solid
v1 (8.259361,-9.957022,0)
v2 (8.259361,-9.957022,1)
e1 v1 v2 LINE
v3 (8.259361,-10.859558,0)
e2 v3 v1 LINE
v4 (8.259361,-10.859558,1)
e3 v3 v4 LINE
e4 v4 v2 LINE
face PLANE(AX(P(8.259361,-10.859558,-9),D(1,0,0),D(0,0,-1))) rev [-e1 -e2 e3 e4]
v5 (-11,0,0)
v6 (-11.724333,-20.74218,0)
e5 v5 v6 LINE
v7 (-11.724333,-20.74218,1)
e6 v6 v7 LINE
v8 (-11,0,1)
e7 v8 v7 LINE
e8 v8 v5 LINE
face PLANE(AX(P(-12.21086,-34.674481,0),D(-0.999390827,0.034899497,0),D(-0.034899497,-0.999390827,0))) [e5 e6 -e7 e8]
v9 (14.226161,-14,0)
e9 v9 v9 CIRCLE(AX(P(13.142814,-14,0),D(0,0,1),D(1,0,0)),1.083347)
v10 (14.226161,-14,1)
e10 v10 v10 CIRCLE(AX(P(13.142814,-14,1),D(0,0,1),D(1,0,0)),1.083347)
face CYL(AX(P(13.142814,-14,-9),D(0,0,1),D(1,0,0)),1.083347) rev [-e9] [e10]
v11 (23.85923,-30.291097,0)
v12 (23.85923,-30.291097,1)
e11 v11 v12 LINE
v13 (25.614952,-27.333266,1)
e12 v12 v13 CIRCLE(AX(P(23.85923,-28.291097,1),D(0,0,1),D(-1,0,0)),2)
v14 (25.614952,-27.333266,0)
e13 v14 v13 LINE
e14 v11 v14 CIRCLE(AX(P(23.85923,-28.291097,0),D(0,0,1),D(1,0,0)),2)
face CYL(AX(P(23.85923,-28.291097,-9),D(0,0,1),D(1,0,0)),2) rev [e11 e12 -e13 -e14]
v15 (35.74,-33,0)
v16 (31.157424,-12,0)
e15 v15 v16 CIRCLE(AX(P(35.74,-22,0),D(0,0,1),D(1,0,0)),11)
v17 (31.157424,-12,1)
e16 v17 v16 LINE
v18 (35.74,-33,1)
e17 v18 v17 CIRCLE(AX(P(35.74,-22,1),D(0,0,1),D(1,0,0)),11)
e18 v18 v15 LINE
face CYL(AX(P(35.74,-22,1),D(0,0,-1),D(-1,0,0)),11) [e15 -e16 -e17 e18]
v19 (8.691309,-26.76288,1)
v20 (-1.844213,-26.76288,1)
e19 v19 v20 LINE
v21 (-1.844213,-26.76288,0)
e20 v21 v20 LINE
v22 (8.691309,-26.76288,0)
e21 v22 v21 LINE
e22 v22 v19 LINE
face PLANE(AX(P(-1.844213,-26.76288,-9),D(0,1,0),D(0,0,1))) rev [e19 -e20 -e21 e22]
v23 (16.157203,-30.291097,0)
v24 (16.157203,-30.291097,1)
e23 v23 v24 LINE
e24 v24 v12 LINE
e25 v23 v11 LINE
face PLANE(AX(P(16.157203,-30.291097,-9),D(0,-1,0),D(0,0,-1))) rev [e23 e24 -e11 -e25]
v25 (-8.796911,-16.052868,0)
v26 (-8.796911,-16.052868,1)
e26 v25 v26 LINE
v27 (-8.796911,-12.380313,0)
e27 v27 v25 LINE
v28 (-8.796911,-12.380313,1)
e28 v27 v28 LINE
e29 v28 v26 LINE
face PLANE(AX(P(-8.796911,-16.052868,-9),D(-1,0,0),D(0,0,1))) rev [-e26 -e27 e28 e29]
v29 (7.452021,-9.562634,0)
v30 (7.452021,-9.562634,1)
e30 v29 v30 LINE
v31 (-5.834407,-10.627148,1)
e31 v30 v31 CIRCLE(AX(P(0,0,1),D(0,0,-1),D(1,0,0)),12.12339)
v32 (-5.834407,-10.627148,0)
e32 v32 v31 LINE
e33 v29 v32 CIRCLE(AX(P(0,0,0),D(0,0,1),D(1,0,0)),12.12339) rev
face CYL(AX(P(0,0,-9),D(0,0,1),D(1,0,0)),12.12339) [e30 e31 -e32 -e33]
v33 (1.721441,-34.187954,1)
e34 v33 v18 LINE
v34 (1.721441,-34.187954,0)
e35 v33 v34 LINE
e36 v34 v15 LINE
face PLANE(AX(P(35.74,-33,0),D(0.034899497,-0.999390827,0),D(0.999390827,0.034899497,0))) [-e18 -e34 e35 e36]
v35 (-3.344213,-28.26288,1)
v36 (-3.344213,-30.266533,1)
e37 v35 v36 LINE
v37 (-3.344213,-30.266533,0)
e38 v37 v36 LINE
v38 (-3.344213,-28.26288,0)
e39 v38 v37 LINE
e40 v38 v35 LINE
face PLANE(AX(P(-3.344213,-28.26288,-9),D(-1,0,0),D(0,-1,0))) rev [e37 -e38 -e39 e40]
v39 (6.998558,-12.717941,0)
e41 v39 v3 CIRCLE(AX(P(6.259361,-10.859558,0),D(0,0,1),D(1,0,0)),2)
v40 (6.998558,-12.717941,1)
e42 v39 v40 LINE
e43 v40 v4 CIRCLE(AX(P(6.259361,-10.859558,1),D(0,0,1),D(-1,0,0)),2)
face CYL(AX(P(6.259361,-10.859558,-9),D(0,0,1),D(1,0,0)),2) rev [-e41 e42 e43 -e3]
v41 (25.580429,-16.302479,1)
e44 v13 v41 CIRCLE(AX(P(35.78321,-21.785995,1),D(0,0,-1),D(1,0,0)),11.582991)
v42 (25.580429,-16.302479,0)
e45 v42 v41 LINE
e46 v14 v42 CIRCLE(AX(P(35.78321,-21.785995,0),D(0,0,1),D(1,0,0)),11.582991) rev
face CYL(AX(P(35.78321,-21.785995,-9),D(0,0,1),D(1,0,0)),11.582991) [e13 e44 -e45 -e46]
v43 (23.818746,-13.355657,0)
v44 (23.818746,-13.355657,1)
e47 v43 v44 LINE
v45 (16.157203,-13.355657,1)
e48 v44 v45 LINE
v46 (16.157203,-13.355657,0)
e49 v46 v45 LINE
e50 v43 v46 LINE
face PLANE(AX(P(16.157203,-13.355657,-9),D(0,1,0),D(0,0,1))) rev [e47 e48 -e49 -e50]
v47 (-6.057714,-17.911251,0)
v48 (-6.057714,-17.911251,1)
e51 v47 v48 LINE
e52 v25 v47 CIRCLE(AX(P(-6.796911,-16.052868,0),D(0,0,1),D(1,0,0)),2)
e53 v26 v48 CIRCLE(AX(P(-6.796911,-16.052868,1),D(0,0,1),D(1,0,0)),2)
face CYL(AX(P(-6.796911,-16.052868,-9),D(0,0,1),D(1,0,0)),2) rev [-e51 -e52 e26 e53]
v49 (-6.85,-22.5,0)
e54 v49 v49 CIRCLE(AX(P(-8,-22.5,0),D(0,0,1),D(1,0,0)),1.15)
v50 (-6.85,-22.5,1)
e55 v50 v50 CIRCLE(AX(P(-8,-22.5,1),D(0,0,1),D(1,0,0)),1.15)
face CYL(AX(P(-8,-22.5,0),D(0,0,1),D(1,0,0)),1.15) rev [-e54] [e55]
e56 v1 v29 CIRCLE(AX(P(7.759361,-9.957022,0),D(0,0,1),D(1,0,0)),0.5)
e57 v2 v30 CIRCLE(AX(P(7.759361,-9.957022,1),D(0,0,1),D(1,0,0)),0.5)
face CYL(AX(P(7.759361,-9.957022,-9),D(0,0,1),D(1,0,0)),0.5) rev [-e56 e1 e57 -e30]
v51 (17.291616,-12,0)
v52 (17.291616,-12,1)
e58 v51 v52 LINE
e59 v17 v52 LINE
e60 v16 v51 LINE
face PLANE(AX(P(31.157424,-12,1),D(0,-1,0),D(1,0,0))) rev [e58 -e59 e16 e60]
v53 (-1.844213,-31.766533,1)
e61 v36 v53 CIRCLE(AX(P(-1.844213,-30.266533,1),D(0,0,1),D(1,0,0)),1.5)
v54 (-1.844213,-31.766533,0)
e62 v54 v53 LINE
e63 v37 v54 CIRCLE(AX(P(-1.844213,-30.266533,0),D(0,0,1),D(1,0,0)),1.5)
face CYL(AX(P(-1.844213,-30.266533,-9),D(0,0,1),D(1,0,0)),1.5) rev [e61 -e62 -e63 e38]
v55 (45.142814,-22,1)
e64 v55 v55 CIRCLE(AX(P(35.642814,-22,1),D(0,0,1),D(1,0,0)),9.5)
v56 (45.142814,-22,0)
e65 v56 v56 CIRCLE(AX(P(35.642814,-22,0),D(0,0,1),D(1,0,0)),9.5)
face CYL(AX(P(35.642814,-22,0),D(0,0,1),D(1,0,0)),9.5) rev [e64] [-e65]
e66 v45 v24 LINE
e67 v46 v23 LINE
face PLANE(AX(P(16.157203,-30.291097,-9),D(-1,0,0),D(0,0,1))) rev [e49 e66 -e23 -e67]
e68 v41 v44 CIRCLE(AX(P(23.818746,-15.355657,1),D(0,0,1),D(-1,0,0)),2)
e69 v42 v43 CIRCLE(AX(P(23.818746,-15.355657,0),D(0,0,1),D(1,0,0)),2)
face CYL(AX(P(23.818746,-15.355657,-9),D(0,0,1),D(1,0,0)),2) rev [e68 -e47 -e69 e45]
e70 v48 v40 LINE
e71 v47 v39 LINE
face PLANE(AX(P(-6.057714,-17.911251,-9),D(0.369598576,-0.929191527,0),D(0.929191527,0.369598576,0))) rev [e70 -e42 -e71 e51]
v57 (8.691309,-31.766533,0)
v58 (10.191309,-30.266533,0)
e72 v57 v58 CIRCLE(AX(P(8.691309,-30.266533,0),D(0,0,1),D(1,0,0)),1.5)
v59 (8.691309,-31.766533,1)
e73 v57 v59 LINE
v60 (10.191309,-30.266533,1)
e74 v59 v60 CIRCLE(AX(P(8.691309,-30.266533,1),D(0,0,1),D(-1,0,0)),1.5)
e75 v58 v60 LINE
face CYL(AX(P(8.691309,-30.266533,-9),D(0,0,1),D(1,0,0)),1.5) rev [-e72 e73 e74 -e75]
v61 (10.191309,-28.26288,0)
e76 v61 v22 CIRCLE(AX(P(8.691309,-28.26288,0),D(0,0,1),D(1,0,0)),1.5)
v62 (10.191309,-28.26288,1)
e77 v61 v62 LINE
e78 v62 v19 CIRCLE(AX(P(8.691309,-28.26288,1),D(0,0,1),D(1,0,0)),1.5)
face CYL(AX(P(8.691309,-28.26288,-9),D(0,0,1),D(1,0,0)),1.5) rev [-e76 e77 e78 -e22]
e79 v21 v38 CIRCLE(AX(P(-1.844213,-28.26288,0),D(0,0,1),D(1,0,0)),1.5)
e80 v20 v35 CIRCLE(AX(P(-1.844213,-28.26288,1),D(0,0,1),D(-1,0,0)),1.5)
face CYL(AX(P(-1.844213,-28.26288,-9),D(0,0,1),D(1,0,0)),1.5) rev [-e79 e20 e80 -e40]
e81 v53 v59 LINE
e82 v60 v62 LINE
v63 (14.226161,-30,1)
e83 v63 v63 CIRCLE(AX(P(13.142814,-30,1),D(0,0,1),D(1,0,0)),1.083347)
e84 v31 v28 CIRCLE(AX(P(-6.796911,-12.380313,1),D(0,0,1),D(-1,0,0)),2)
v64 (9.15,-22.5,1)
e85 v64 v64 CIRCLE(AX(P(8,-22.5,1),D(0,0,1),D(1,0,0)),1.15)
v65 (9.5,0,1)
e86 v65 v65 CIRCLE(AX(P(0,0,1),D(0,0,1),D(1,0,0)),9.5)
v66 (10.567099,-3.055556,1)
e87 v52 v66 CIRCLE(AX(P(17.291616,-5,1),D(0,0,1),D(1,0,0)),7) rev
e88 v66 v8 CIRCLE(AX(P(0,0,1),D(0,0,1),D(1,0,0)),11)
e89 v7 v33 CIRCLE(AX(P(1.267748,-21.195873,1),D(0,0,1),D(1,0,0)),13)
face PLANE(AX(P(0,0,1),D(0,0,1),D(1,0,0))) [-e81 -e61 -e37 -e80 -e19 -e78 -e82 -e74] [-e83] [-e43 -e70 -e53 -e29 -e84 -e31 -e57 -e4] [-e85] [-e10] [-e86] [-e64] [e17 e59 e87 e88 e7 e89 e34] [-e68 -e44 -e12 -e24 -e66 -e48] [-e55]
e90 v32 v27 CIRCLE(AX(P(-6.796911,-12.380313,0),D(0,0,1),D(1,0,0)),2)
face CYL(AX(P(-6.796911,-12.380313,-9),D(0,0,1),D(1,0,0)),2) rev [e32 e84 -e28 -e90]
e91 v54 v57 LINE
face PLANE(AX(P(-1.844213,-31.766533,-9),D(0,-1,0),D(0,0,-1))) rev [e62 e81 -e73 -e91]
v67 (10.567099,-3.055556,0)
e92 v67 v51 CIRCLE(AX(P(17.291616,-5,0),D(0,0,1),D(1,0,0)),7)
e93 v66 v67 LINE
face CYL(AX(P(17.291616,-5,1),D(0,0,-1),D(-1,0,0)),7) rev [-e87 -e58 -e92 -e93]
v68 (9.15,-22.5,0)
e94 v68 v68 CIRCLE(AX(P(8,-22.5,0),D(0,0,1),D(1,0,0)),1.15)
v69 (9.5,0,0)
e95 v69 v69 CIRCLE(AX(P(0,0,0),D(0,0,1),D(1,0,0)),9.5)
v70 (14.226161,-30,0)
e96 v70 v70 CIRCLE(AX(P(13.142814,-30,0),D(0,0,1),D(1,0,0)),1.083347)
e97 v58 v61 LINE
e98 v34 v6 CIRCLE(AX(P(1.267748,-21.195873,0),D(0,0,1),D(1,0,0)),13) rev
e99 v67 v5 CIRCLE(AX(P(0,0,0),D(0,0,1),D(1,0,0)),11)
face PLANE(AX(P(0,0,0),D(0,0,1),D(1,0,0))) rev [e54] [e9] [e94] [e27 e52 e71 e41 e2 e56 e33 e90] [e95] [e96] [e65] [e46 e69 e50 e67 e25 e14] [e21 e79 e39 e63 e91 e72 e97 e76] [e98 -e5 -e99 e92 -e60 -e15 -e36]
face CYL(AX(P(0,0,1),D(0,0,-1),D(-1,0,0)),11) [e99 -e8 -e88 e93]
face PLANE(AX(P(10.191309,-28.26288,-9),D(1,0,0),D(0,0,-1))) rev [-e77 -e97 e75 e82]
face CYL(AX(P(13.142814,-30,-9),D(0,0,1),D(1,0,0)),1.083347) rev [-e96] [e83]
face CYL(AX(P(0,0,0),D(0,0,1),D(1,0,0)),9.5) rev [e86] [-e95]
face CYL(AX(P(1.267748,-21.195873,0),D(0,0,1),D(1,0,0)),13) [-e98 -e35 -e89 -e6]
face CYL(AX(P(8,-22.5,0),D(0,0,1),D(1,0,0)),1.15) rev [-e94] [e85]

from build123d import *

# Parameters (mm, degrees)
SKETCH_3_R          = 9.5
EXTRUDE_1_DEPTH     = 1
EXTRUDE_START       = -1
EXTRUDE_2_DEPTH     = 1
FILLET_2_R          = 13
SKETCH_5_R          = 1.15
CUT_EXTRUDE_1_DEPTH = 58.922235489
SKETCH_6_R          = 9.5
CUT_EXTRUDE_2_DEPTH = 58.922235489
FILLET_3_R          = 8
FILLET_4_R          = 7
SKETCH_7_R          = 1.08334678
CUT_EXTRUDE_4_DEPTH = 10
CUT_EXTRUDE_5_DEPTH = 10


with BuildPart() as part:
    # 草图3 → 凸台-拉伸1 (new body)
    with BuildSketch(Plane.XY):
        with BuildLine():
            Line((-11, 0), (-11, -33))
            Line((-11, -33), (35.74, -33))
            ThreePointArc((35.74, -33), (46.48709263, -19.65479212), (31.157424305, -12))
            Line((31.157424305, -12), (9, -12))
            Line((9, -12), (9, -6.32455532))
            ThreePointArc((9, -6.32455532), (3.31662479, 10.488088482), (-11, 0))
        make_face()
        Circle(SKETCH_3_R, mode=Mode.SUBTRACT)
        with Locations((35.74, -22)):
            Circle(SKETCH_3_R, mode=Mode.SUBTRACT)
    extrude(amount=EXTRUDE_1_DEPTH)

    # 草图4 → 凸台-拉伸2 (add)
    with BuildSketch(Plane.XY.offset(1).offset(EXTRUDE_START)):
        with BuildLine():
            Line((35.74, -33), (-12.210859555, -34.674480913))
            Line((-12.210859555, -34.674480913), (-11, 0))
            ThreePointArc((-11, 0), (3.31662479, 10.488088482), (9, -6.32455532))
            Line((9, -6.32455532), (9, -12))
            Line((9, -12), (31.157424305, -12))
            ThreePointArc((31.157424305, -12), (46.48709263, -19.65479212), (35.74, -33))
        make_face()
    extrude(amount=EXTRUDE_2_DEPTH)

    # 圆角2
    fillet_2_edges = [part.edges().sort_by_distance(p)[0] for p in [
        (-12.210859555, -34.674480913, 0.5),
    ]]
    fillet(fillet_2_edges, radius=FILLET_2_R)

    # 草图5 → 切除-拉伸1 (cut, through all)
    with BuildSketch(Plane.XY.offset(1)):
        with Locations((-8, -22.5)):
            Circle(SKETCH_5_R)
        with Locations((8, -22.5)):
            Circle(SKETCH_5_R)
    extrude(amount=-CUT_EXTRUDE_1_DEPTH, mode=Mode.SUBTRACT)

    # 草图6 → 切除-拉伸2 (cut, through all)
    with BuildSketch(Plane.XY.offset(1)):
        Circle(SKETCH_6_R)
        with Locations((35.642814002, -22)):
            Circle(SKETCH_6_R)
    extrude(amount=-CUT_EXTRUDE_2_DEPTH, mode=Mode.SUBTRACT)

    # 圆角3
    # the kernel refuses this fillet: 8 mm, written as the material it adds along each edge
    with BuildSketch(Plane(origin=(9, -12, 0), x_dir=(0, 1, 0), z_dir=(0, 0, 1))) as fillet_3_piece_1:
        with BuildLine():
            CenterArc((8, -7.654831322), FILLET_3_R, 106.89204914, 73.10795086)
            Line((0, -7.654831322), (-0.16, -7.654831322))
            Line((-0.16, -7.654831322), (-0.16, 0))
            Line((-0.16, 0), (0, 0.16))
            ThreePointArc((0, 0.16), (2.83772234, 0.16), (5.628953573, 0.153096626))
            Line((5.628953573, 0.153096626), (5.67544468, 0))
        make_face()
    extrude(amount=1)

    # 圆角4
    fillet_4_edges = [part.edges().sort_by_distance(p)[0] for p in [
        (9, -6.32455532, 0.5),
    ]]
    fillet(fillet_4_edges, radius=FILLET_4_R)

    # 草图7 → 切除-拉伸4 (cut)
    with BuildSketch(Plane.XY.offset(1)):
        with Locations((13.142814002, -14)):
            Circle(SKETCH_7_R)
        with Locations((13.142814002, -30)):
            Circle(SKETCH_7_R)
    extrude(amount=-CUT_EXTRUDE_4_DEPTH, mode=Mode.SUBTRACT)

    # 草图8 → 切除-拉伸5 (cut)
    with BuildSketch(Plane.XY.offset(1)):
        with BuildLine():
            Line((16.157202734, -30.291096898), (16.157202734, -13.355657228))
            Line((16.157202734, -13.355657228), (23.81874567, -13.355657228))
            ThreePointArc((23.81874567, -13.355657228), (25.535376674, -14.32941262), (25.580428982, -16.302479233))
            ThreePointArc((25.580428982, -16.302479233), (24.200275644, -21.822246327), (25.614952461, -27.333266333))
            ThreePointArc((25.614952461, -27.333266333), (25.579064672, -29.3119639), (23.859230214, -30.291096898))
            Line((23.859230214, -30.291096898), (16.157202734, -30.291096898))
        make_face()
        with BuildLine():
            Line((-1.844212644, -26.7628803), (8.691309214, -26.7628803))
            ThreePointArc((8.691309214, -26.7628803), (9.751969386, -27.202220128), (10.191309214, -28.2628803))
            Line((10.191309214, -28.2628803), (10.191309214, -30.26653293))
            ThreePointArc((10.191309214, -30.26653293), (9.751969386, -31.327193102), (8.691309214, -31.76653293))
            Line((8.691309214, -31.76653293), (-1.844212644, -31.76653293))
            ThreePointArc((-1.844212644, -31.76653293), (-2.904872816, -31.327193102), (-3.344212644, -30.26653293))
            Line((-3.344212644, -30.26653293), (-3.344212644, -28.2628803))
            ThreePointArc((-3.344212644, -28.2628803), (-2.904872816, -27.202220128), (-1.844212644, -26.7628803))
        make_face()
        with BuildLine():
            Line((-8.796911022, -16.052867786), (-8.796911022, -12.380312846))
            ThreePointArc((-8.796911022, -12.380312846), (-7.815486406, -10.659120182), (-5.834406834, -10.627148368))
            ThreePointArc((-5.834406834, -10.627148368), (0.968228408, -12.084664633), (7.452020697, -9.562634212))
            ThreePointArc((7.452020697, -9.562634212), (7.978826228, -9.507761331), (8.259361329, -9.957022011))
            Line((8.259361329, -9.957022011), (8.259361329, -10.859557769))
            ThreePointArc((8.259361329, -10.859557769), (7.914413338, -11.982412545), (6.99855848, -12.717940822))
            Line((6.99855848, -12.717940822), (-6.057713871, -17.911250839))
            ThreePointArc((-6.057713871, -17.911250839), (-7.919765799, -17.707919794), (-8.796911022, -16.052867786))
        make_face()
    extrude(amount=-CUT_EXTRUDE_5_DEPTH, mode=Mode.SUBTRACT)


solid = part.part
